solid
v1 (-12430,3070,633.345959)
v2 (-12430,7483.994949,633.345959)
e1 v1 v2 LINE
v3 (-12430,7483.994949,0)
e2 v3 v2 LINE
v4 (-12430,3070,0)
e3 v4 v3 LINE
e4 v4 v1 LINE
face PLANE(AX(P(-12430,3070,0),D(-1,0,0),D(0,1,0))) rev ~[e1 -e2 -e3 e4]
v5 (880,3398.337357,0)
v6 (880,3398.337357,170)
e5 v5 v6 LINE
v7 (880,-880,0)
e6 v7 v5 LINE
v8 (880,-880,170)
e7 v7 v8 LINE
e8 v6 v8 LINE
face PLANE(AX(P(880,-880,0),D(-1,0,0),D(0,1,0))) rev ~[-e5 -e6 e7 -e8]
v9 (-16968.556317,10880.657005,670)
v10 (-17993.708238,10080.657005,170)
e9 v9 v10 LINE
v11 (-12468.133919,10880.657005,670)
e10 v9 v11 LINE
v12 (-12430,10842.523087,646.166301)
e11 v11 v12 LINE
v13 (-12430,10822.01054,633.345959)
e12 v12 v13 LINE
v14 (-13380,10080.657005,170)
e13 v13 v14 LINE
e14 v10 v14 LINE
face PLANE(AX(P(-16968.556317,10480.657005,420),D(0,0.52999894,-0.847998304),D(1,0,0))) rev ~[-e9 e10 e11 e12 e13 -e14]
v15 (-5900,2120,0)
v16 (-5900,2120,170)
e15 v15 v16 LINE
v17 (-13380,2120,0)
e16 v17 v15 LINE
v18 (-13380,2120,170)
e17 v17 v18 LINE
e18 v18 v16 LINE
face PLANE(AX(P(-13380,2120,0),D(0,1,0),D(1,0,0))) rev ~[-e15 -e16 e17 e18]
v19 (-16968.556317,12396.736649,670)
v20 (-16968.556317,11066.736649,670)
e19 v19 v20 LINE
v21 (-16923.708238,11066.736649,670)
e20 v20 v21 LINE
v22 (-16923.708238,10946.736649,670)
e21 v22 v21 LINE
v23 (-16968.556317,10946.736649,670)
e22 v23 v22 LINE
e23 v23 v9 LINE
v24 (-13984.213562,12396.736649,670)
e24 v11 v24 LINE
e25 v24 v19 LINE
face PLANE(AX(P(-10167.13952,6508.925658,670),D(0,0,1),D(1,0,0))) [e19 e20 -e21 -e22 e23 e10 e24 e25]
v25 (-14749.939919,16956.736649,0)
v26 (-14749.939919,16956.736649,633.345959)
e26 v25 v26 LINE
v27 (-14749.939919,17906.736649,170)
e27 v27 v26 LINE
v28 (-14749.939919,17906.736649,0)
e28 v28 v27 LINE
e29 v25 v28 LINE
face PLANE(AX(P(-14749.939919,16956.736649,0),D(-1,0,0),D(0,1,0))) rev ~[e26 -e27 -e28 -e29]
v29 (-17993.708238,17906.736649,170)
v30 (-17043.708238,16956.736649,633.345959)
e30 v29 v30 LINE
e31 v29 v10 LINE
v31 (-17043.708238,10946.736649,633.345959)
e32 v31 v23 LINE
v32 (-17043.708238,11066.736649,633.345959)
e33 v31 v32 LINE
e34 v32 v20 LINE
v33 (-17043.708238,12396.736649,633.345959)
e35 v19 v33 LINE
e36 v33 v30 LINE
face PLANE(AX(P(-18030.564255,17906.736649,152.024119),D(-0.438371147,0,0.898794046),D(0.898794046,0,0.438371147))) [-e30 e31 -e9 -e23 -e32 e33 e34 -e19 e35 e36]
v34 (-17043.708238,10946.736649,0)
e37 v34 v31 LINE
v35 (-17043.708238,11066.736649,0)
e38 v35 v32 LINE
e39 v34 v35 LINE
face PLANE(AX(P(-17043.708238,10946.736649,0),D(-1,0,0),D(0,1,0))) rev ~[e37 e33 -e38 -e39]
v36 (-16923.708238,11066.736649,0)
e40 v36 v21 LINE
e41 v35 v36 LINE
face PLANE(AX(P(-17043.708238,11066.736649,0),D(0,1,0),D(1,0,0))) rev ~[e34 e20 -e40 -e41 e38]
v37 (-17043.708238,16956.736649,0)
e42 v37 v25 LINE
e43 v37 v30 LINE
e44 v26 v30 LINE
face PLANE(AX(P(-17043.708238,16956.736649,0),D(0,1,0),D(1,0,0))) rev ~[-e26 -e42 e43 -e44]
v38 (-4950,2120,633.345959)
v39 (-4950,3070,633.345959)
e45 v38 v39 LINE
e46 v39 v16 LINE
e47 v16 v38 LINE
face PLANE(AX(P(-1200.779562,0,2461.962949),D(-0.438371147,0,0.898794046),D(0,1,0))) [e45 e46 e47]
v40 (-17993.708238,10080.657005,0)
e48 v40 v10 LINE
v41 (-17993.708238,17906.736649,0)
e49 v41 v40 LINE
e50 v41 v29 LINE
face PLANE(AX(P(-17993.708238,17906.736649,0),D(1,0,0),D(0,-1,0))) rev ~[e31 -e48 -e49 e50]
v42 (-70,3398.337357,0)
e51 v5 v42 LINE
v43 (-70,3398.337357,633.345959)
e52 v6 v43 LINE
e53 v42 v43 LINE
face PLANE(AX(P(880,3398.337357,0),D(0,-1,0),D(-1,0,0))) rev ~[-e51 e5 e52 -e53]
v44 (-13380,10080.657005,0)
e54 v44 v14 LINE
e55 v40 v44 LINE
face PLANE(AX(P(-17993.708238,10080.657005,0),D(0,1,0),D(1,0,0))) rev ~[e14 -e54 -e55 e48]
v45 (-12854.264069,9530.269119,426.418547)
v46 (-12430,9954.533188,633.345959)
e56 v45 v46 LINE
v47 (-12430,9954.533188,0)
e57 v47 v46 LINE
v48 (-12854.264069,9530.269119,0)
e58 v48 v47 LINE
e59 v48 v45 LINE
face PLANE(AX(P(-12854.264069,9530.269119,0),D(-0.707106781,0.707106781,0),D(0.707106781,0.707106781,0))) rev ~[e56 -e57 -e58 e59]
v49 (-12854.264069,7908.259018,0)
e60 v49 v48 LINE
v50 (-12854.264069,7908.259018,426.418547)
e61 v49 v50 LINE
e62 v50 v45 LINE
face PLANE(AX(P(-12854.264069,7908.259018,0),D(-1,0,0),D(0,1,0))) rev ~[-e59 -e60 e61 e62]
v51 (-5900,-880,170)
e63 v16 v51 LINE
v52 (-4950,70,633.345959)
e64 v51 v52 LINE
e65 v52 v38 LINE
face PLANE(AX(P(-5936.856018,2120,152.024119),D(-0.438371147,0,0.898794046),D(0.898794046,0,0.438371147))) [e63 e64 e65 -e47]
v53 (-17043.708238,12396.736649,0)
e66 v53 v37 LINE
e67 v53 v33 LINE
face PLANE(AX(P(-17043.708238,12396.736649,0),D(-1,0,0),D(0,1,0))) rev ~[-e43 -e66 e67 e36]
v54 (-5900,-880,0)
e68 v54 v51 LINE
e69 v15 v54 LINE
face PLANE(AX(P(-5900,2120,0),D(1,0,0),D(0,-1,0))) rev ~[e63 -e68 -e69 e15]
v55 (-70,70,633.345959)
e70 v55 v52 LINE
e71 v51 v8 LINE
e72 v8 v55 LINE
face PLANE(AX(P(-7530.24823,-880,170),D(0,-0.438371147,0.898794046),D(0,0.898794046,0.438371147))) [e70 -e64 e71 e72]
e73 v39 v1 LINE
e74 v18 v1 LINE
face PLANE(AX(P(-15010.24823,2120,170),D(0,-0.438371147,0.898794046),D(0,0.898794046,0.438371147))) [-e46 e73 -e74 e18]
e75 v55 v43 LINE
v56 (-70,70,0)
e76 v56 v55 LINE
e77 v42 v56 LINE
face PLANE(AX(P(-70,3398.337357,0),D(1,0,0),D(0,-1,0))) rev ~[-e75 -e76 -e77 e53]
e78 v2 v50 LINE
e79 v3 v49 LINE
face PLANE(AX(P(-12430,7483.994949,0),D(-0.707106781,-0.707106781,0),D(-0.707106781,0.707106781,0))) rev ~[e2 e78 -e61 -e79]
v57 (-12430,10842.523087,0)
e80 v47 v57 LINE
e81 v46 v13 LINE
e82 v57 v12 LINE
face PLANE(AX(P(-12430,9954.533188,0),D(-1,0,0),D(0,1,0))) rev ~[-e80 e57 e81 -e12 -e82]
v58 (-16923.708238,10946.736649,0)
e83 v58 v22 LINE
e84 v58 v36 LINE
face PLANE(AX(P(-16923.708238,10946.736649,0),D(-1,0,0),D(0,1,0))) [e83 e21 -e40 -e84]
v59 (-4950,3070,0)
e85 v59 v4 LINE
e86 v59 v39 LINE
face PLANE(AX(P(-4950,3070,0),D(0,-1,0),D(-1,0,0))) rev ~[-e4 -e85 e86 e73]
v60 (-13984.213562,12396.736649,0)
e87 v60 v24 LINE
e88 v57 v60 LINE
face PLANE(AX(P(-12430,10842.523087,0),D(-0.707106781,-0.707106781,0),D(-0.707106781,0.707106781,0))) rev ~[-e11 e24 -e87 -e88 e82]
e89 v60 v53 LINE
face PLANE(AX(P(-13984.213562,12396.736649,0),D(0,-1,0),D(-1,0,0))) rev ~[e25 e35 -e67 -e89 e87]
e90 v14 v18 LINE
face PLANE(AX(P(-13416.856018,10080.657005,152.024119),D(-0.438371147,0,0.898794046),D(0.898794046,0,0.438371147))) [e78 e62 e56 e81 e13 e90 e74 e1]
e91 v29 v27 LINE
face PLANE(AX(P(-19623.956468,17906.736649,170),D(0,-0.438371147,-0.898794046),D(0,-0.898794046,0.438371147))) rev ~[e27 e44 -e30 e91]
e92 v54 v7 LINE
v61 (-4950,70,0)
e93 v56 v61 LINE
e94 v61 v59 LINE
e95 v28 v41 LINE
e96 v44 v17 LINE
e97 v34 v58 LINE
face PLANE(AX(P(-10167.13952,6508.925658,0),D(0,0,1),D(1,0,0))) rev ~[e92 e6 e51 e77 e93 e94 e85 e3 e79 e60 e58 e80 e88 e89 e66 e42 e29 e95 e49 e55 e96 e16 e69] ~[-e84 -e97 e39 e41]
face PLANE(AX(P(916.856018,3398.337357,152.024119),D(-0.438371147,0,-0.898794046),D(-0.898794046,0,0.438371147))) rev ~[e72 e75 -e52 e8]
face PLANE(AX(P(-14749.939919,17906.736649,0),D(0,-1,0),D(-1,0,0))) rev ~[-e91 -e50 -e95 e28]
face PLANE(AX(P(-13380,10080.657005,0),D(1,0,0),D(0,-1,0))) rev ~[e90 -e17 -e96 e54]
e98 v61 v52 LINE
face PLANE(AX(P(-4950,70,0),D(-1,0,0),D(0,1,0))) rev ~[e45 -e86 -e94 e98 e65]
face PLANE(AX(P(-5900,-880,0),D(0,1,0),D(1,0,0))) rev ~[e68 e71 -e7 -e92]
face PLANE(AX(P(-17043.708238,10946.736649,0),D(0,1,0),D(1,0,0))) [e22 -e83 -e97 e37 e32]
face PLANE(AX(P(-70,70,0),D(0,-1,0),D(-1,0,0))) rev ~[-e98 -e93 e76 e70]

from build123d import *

# Parameters (mm, degrees)
F0_W        = 120
F0_H        = 120
F1_DEPTH    = 670
F2_T1_DEPTH = 3000
F2_T3_DEPTH = 4278.3373567146
F2_T5_DEPTH = 7960.6570053101
F2_T7_DEPTH = 7826.079643853
F3_T1_DEPTH = 10040.4964600443
F3_T3_DEPTH = 7529.4166998783
F3_T8_DEPTH = 12715.6483808339
F4_SIZE2    = 500
F4_SIZE     = 800


# Not quite as in the source:
# - a fillet or chamfer that OpenCascade refuses, or shapes differently, is made with other operations: its cross-section is extruded or revolved along the edge and cut away or added


with BuildPart() as f1:
    # F0 (on Top) → F1 (new body)
    with BuildSketch(Plane.XY):
        Polygon((-13984.2135623731, 12396.7366491631), (-17043.7082375624, 12396.7366491631), (-17043.7082375624, 16956.7366491631), (-14749.9399185181, 16956.7366491631), (-14749.9399185181, 17026.7366491631), (-14749.9399185181, 17906.7366491631), (-17993.7082375624, 17906.7366491631), (-17993.7082375624, 10080.6570053101), (-13380, 10080.6570053101), (-13380, 2120), (-5900, 2120), (-5900, -880), (880, -880), (880, 3398.3373567146), (-70, 3398.3373567146), (-70, 70), (-4950, 70), (-4950, 3070), (-12430, 3070), (-12430, 7483.9949493661), (-12854.2640687119, 7908.259018078), (-12854.2640687119, 9530.2691193458), (-12430, 9954.5331880577), (-12430, 10842.52308679), align=None)
        with Locations((-16983.7082375624, 11006.7366491631)):
            Rectangle(F0_W, F0_H, mode=Mode.SUBTRACT)
    extrude(amount=F1_DEPTH)

    # F2: chamfer of 500 x 1025.1519207896 on 4 edges, made by hand

    # F2_s2 → F2_t1 (cut)
    with BuildSketch(Plane.XZ.offset(-2120)):
        with BuildLine():
            Line((-5936.8560177183, 152.024119074), (-4837.992061492, 687.975880926))
            Line((-4837.992061492, 687.975880926), (-4837.992061492, 708.4789193418))
            ThreePointArc((-4837.992061492, 708.4789193418), (-5368.996030746, 690.5030384158), (-5900, 690.5030384158))
            Line((-5900, 690.5030384158), (-5920.5030384158, 670))
            ThreePointArc((-5920.5030384158, 670), (-5920.5030384158, 411.012059537), (-5957.3590561341, 152.024119074))
            Line((-5957.3590561341, 152.024119074), (-5936.8560177183, 152.024119074))
        make_face()
    extrude(amount=F2_T1_DEPTH, mode=Mode.SUBTRACT)

    # F2_s4 → F2_t3 (cut)
    with BuildSketch(Plane.XZ.offset(-3398.3373567146)):
        with BuildLine():
            Line((916.8560177183, 152.024119074), (-182.007938508, 687.975880926))
            Line((-182.007938508, 687.975880926), (-182.007938508, 708.4789193418))
            ThreePointArc((-182.007938508, 708.4789193418), (348.996030746, 690.5030384158), (880, 690.5030384158))
            Line((880, 690.5030384158), (900.5030384158, 670))
            ThreePointArc((900.5030384158, 670), (900.5030384158, 411.012059537), (937.3590561341, 152.024119074))
            Line((937.3590561341, 152.024119074), (916.8560177183, 152.024119074))
        make_face()
    extrude(amount=F2_T3_DEPTH, mode=Mode.SUBTRACT)

    # F2_s6 → F2_t5 (cut)
    with BuildSketch(Plane.XZ.offset(-10080.6570053101)):
        with BuildLine():
            Line((-13416.8560177183, 152.024119074), (-12317.992061492, 687.975880926))
            Line((-12317.992061492, 687.975880926), (-12317.992061492, 708.4789193418))
            ThreePointArc((-12317.992061492, 708.4789193418), (-12848.996030746, 690.5030384158), (-13380, 690.5030384158))
            Line((-13380, 690.5030384158), (-13400.5030384158, 670))
            ThreePointArc((-13400.5030384158, 670), (-13400.5030384158, 411.012059537), (-13437.3590561341, 152.024119074))
            Line((-13437.3590561341, 152.024119074), (-13416.8560177183, 152.024119074))
        make_face()
    extrude(amount=F2_T5_DEPTH, mode=Mode.SUBTRACT)

    # F2_s8 → F2_t7 (cut)
    with BuildSketch(Plane.XZ.offset(-17906.7366491631)):
        with BuildLine():
            Line((-18030.5642552807, 152.024119074), (-16931.7002990544, 687.975880926))
            Line((-16931.7002990544, 687.975880926), (-16931.7002990544, 708.4789193418))
            ThreePointArc((-16931.7002990544, 708.4789193418), (-17462.7042683084, 690.5030384158), (-17993.7082375624, 690.5030384158))
            Line((-17993.7082375624, 690.5030384158), (-18014.2112759782, 670))
            ThreePointArc((-18014.2112759782, 670), (-18014.2112759782, 411.012059537), (-18051.0672936965, 152.024119074))
            Line((-18051.0672936965, 152.024119074), (-18030.5642552807, 152.024119074))
        make_face()
    extrude(amount=F2_T7_DEPTH, mode=Mode.SUBTRACT)

    # F3: chamfer of 500 x 1025.1519207896 on 3 edges, made by hand

    # F3_s2 → F3_t1 (cut)
    with BuildSketch(Plane.YZ.offset(-7530.2482300221)):
        Polygon((-880, 170), (145.1519207896, 670), (-880, 670), align=None)
    extrude(amount=F3_T1_DEPTH, mode=Mode.SUBTRACT)

    # F3_s4 → F3_t3 (cut)
    with BuildSketch(Plane.YZ.offset(-19623.9564675845)):
        Polygon((17906.7366491631, 170), (16881.5847283734, 670), (17906.7366491631, 670), align=None)
    extrude(amount=F3_T3_DEPTH, mode=Mode.SUBTRACT)


with BuildPart() as f3_tool6:
    # F3_s7 → F3_t8 (new body)
    with BuildSketch(Plane.YZ.offset(-15010.2482300221)):
        Polygon((2120, 170), (3145.1519207896, 670), (2120, 670), align=None)
    extrude(amount=F3_T8_DEPTH)

    split(bisect_by=Plane(origin=(-1200.779561846, 0, 2461.9629485426), x_dir=(0, 1, 0), z_dir=(-0.4383711468, 0, 0.8987940463)), keep=Keep.TOP)


with BuildPart() as f1_1:
    add(f1.part)

    # F3_t5: cut F3_tool6
    add(f3_tool6.part, mode=Mode.SUBTRACT)

    # F4
    f4_edges = [f1_1.edges().sort_by_distance(p)[0] for p in [
        (-14699.278158, 10080.657005, 670),
    ]]
    f4_side = f1_1.faces().sort_by_distance((-14925.443793, 11155.7049, 670))[0]
    chamfer(f4_edges, length=F4_SIZE, length2=F4_SIZE2, reference=f4_side)


solid = f1_1.part
